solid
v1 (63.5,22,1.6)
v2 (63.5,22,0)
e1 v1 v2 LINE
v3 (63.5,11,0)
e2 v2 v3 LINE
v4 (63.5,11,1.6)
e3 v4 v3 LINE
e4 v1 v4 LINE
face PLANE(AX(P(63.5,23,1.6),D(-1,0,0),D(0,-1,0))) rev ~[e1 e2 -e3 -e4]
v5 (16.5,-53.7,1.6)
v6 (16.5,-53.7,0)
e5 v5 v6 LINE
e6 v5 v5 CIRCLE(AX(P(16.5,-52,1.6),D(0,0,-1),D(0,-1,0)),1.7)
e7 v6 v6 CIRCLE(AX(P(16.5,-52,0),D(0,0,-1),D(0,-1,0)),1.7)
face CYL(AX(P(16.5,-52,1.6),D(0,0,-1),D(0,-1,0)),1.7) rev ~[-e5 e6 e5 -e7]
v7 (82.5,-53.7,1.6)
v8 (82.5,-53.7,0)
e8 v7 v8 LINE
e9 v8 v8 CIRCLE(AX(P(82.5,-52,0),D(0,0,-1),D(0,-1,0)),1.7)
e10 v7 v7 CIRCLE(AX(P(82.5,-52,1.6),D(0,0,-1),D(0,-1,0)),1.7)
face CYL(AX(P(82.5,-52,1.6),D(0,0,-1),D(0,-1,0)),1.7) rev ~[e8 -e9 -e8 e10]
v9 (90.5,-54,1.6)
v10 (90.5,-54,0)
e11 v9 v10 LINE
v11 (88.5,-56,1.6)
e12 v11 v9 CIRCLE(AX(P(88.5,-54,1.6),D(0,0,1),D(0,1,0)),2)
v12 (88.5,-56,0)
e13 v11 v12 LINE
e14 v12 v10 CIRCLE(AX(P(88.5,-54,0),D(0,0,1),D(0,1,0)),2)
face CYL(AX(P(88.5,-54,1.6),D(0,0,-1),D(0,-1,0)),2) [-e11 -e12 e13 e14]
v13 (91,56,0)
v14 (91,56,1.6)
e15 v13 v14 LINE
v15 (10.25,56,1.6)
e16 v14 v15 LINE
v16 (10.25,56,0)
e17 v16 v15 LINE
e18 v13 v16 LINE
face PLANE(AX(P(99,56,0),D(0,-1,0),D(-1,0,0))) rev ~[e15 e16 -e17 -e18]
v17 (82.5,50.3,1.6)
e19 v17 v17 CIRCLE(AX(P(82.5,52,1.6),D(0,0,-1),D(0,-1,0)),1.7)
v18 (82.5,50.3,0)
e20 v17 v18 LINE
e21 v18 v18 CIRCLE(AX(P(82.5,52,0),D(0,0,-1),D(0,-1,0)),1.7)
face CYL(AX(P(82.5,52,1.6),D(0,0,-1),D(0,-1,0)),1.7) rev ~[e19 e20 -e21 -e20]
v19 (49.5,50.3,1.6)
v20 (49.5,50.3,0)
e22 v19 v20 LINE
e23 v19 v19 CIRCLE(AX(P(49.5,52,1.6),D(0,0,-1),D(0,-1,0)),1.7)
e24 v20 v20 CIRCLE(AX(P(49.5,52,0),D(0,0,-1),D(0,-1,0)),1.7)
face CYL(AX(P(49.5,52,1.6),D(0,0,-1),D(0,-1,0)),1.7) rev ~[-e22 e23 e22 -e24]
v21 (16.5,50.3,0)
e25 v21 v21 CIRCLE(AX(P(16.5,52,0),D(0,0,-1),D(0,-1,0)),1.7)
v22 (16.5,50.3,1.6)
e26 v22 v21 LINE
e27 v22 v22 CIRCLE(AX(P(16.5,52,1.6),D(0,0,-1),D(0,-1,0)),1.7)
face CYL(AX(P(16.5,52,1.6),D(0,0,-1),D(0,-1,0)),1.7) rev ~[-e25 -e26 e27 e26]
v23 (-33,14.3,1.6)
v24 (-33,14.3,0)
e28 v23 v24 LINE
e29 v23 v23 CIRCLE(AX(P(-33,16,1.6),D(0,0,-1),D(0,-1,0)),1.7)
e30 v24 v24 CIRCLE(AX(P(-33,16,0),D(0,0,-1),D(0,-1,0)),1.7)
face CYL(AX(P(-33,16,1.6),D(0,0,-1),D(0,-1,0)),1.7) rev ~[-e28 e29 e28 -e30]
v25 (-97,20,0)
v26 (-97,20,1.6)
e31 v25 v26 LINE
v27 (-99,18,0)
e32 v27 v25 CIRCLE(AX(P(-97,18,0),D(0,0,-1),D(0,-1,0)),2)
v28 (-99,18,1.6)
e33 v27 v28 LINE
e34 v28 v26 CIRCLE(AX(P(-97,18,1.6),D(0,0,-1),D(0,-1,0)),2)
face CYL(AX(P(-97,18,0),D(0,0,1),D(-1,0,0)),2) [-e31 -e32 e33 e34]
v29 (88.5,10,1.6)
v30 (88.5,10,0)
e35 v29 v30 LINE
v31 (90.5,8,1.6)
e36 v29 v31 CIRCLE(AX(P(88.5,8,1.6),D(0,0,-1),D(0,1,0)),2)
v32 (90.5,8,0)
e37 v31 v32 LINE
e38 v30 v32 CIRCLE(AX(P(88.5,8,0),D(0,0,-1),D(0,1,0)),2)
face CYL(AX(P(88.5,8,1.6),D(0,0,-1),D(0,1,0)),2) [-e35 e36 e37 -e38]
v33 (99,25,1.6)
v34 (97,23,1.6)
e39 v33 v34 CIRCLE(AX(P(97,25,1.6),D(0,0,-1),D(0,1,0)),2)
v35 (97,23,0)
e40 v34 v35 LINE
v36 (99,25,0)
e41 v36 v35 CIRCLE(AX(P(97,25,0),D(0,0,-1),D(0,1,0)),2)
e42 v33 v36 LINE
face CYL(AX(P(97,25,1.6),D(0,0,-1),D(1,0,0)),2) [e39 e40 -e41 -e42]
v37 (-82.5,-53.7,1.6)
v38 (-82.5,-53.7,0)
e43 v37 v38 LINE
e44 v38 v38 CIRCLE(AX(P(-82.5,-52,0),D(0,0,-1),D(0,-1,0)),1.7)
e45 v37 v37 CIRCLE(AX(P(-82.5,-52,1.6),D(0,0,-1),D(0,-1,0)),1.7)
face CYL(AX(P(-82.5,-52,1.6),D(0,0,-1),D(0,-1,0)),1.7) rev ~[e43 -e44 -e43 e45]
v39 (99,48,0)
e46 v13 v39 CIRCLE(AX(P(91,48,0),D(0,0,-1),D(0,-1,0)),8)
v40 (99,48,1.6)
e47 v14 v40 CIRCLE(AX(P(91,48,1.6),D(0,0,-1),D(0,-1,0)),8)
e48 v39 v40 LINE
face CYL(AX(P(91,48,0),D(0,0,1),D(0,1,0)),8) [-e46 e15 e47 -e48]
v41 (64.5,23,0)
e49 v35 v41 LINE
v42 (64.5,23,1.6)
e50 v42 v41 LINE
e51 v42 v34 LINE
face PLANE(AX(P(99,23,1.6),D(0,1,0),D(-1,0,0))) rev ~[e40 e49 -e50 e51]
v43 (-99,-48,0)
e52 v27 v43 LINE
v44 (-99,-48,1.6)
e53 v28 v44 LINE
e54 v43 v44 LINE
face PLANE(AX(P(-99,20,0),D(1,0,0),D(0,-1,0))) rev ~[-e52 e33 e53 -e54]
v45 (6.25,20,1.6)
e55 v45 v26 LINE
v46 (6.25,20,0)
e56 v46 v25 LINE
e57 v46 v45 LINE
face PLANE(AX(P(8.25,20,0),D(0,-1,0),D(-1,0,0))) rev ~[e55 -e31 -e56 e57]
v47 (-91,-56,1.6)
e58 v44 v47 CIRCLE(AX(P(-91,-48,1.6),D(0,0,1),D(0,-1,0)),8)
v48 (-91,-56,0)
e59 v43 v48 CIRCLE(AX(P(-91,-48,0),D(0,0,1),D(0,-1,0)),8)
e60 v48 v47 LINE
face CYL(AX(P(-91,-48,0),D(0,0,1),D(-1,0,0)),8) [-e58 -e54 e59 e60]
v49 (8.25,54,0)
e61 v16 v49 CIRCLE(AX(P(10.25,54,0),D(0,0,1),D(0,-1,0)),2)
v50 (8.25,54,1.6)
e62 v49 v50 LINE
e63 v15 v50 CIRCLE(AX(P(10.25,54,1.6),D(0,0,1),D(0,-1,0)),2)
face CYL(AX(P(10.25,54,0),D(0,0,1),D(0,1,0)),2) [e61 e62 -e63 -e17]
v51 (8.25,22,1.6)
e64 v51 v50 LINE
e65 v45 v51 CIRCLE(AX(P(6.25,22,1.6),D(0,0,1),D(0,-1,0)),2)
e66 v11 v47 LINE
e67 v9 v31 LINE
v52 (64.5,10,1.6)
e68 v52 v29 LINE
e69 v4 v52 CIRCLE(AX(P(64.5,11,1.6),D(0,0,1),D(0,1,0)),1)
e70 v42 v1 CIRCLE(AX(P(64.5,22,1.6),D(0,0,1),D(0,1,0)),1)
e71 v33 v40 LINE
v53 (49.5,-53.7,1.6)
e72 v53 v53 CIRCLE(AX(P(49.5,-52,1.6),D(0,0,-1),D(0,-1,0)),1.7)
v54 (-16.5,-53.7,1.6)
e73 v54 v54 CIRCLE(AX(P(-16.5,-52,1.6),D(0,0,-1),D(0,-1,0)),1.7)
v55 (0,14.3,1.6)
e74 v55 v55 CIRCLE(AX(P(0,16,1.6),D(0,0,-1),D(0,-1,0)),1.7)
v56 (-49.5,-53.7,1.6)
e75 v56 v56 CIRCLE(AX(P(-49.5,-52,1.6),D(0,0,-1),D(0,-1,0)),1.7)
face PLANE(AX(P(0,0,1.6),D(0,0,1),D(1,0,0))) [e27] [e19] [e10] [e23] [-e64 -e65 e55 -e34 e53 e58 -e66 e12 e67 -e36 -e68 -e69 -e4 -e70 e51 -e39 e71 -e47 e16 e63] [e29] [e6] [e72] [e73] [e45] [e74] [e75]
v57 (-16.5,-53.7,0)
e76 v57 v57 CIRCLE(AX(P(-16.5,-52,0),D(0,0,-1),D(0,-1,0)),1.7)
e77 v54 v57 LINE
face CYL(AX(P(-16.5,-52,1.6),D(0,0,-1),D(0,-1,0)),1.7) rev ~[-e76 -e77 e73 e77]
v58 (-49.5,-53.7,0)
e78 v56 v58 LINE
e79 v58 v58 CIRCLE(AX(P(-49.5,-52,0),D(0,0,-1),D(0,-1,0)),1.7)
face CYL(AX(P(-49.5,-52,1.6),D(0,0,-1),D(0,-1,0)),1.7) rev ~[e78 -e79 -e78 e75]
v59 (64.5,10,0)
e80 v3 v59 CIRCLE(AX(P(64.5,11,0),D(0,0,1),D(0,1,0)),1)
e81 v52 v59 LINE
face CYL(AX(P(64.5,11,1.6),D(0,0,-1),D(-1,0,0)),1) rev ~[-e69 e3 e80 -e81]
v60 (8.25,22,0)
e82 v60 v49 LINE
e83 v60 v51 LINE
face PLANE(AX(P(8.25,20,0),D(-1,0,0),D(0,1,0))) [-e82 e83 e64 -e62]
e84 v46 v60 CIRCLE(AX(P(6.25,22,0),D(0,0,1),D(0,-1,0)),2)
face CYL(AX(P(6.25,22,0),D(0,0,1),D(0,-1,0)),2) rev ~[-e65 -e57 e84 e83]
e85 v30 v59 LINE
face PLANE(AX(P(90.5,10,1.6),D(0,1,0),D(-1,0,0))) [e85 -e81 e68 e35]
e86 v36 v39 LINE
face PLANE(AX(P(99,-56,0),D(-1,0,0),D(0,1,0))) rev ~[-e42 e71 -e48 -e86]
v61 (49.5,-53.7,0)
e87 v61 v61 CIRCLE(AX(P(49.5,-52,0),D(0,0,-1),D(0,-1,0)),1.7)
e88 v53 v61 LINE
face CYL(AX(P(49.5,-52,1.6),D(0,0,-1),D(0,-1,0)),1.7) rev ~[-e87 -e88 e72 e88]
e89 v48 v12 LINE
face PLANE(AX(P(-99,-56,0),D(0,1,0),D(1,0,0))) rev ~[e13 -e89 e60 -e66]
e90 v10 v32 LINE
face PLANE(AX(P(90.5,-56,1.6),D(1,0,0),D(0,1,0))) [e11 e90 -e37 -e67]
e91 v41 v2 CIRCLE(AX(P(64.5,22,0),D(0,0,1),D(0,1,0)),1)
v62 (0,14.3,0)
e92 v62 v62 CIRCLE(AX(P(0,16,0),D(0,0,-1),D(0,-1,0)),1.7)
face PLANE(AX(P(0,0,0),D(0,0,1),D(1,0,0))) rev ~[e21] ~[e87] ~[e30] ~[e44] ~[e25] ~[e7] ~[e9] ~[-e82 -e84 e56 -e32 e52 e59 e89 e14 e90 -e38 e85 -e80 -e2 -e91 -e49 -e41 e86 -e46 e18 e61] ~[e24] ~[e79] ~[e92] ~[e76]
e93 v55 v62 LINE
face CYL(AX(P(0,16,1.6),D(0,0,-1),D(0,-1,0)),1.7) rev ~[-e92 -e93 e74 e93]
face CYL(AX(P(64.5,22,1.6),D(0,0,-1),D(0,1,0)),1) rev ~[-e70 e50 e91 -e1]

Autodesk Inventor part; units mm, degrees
ref_plane "YZ Plane" through (0, 0, 0) normal (1, 0, 0) x (0, 1, 0)
ref_plane "XZ Plane" through (0, 0, 0) normal (0, 1, 0) x (-1, 0, 0)
ref_plane "XY Plane" through (0, 0, 0) normal (0, 0, 1) x (1, 0, 0)
sketch "Sketch1" plane through (0, 0, 0) normal (0, 0, 1) x (1, 0, 0)
  line L0 (-99, -56) -> (99, -56)
  line L1 (99, -56) -> (99, 56)
  line L2 (99, 56) -> (-99, 56)
  line L3 (-99, 56) -> (-99, -56)
  line L4 (-99, -56) -> (99, 56) construction
  line L5 (99, -56) -> (-99, 56) construction
  line L6 (-99, -56) -> (8.25, -56)
  line L7 (8.25, -56) -> (8.25, 20)
  line L8 (8.25, 20) -> (-99, 20)
  line L9 (-99, 20) -> (-99, -56)
  line L10 (8.25, 20) -> (8.25, 56)
  point P0 (0, 0)
  dimension "d0" = 112
  dimension "d1" = 198
  dimension "d3" = 76
  dimension "d50" = 8.25
extrude "Extrusion1" add sketch "Sketch1" along normal blind 1.6 contours L3 L8 L7 L0 | L7 L10 L2 L1 L0
sketch "Sketch2" plane through (0, 0, 1.6) normal (0, 0, 1) x (1, 0, 0)
  line L0 (-99, -56) -> (99, -56) projected
  line L1 (-99, 20) -> (-99, -56) projected
  line L2 (99, 56) -> (8.25, 56) projected
  line L3 (99, -56) -> (99, 56) projected
  line L4 (8.25, 20) -> (-99, 20) projected
  line L5 (-16.5, -52) -> (16.5, -52) construction
  line L6 (-49.5, -52) -> (-16.5, -52) construction
  point P0 (0, 0)
  point P1 (-82.5, -52)
  point P2 (49.5, -52)
  point P3 (-82.5, 52)
  point P4 (-49.5, 52)
  point P5 (-16.5, 52)
  point P6 (16.5, 52)
  point P7 (49.5, 52)
  point P8 (82.5, -52)
  point P9 (82.5, 52)
  point P10 (-33, 16)
  point P11 (0, 16)
  point P12 (0, -52)
  point P13 (-33, -52)
  point P14 (-99, 56)
  dimension "d6" = 4
  dimension "d9" = 33
  dimension "d12" = 104
  dimension "d15" = 4
  dimension "d17" = 16.5
  dimension "d18" = 16.5
  dimension "d26" = 4
hole "Hole1" at (-82.5, -52, 1.6) at (-49.5, -52, 1.6) at (-16.5, -52, 1.6) at (16.5, -52, 1.6) at (49.5, -52, 1.6) at (-82.5, 52, 1.6) at (-49.5, 52, 1.6) at (-16.5, 52, 1.6) at (16.5, 52, 1.6) at (49.5, 52, 1.6) at (82.5, -52, 1.6) at (82.5, 52, 1.6) at (-33, 16, 1.6) at (0, 16, 1.6) direction (0, 0, -1) diameter 3.4 end through all
sketch "Sketch3" plane through (0, 0, 1.6) normal (0, 0, 1) x (1, 0, 0)
  circle A0 centre (0, 16) radius 1.7 projected
  circle A1 centre (-33, 16) radius 1.7 projected
  circle A2 centre (82.5, 52) radius 1.7 projected
  circle A3 centre (82.5, -52) radius 1.7 projected
  circle A4 centre (49.5, 52) radius 1.7 projected
  circle A5 centre (16.5, 52) radius 1.7 projected
  circle A6 centre (49.5, -52) radius 1.7 projected
  circle A7 centre (16.5, -52) radius 1.7 projected
  circle A8 centre (-16.5, -52) radius 1.7 projected
  circle A9 centre (-49.5, -52) radius 1.7 projected
  circle A10 centre (-82.5, -52) radius 1.7 projected
  line L0 (99, 56) -> (8.25, 56) projected
  line L1 (-99, 20) -> (-99, -56) projected
  line L2 (-99, -56) -> (99, -56) projected
  line L3 (99, -56) -> (99, 56) projected
  line L4 (99, 23) -> (0, 23) construction
  line L5 (99, 10) -> (-99, 10) construction
  line L6 (90.5, -56) -> (90.5, 10)
  line L7 (99, 23) -> (80.5, 23)
  line L8 (80.5, 23) -> (80.5, 10)
  line L9 (90.5, 10) -> (80.5, 10)
  line L10 (63.5, 10) -> (80.5, 10)
  line L11 (80.5, 10) -> (80.5, 23)
  line L12 (80.5, 23) -> (63.5, 23)
  line L13 (63.5, 23) -> (63.5, 10)
  line L14 (63.5, 10) -> (80.5, 23) construction
  line L15 (80.5, 10) -> (63.5, 23) construction
  line L16 (8.25, 56) -> (8.25, 20) projected
  line L17 (8.25, 20) -> (-99, 20) projected
  point P0 (0, 0)
  point P1 (82.5, 27)
  point P2 (72, 16.5)
  dimension "d29" = 4
  dimension "d30" = 8
  dimension "d31" = 4
  dimension "d32" = 4
  dimension "d33" = 2
  dimension "d36" = 72.5
  dimension "d37" = 17
  dimension "d38" = 13
extrude "Extrusion2" cut sketch "Sketch3" against normal through all contours L3 L2 L6 L9 L8 L7 | L8 L10 L13 L12
fillet "Fillet1" radius 8 2 edges at (-99, -56, 0.8) (99, 56, 0.8)
fillet "Fillet2" radius 2 6 edges at (90.5, 10, 0.8) (8.25, 20, 0.8) (-99, 20, 0.8) (8.25, 56, 0.8) (90.5, -56, 0.8) (99, 23, 0.8)
fillet "Fillet3" radius 1 2 edges at (63.5, 23, 0.8) (63.5, 10, 0.8)
sketch "Sketch5" plane through (0, 0, 1.6) normal (0, 0, 1) x (1, 0, 0)
  circle A0 centre (0, 16) radius 1.7 projected
  circle A1 centre (-33, 16) radius 1.7 projected
  circle A2 centre (82.5, 52) radius 1.7 projected
  circle A3 centre (82.5, -52) radius 1.7 projected
  circle A4 centre (49.5, 52) radius 1.7 projected
  circle A5 centre (16.5, 52) radius 1.7 projected
  circle A6 centre (49.5, -52) radius 1.7 projected
  circle A7 centre (16.5, -52) radius 1.7 projected
  circle A8 centre (-16.5, -52) radius 1.7 projected
  circle A9 centre (-49.5, -52) radius 1.7 projected
  circle A10 centre (-82.5, -52) radius 1.7 projected
  arc A11 (88.5, -56) -> (90.5, -54) centre (88.5, -54) ccw projected
  line L0 (90.5, -54) -> (90.5, 8) projected
  arc A12 (90.5, 8) -> (88.5, 10) centre (88.5, 8) ccw projected
  line L1 (88.5, 10) -> (64.5, 10) projected
  arc A13 (63.5, 11) -> (64.5, 10) centre (64.5, 11) ccw projected
  line L2 (63.5, 11) -> (63.5, 22) projected
  arc A14 (64.5, 23) -> (63.5, 22) centre (64.5, 22) ccw projected
  line L3 (64.5, 23) -> (97, 23) projected
  line L4 (99, 25) -> (99, 48) projected
  arc A15 (99, 48) -> (91, 56) centre (91, 48) ccw projected
  line L5 (91, 56) -> (10.25, 56) projected
  arc A16 (10.25, 56) -> (8.25, 54) centre (10.25, 54) ccw projected
  line L6 (8.25, 54) -> (8.25, 22) projected
  arc A17 (6.25, 20) -> (8.25, 22) centre (6.25, 22) ccw projected
  line L7 (6.25, 20) -> (-97, 20) projected
  arc A18 (-97, 20) -> (-99, 18) centre (-97, 18) ccw projected
  line L8 (-99, 18) -> (-99, -48) projected
  arc A19 (-99, -48) -> (-91, -56) centre (-91, -48) ccw projected
  line L9 (-91, -56) -> (88.5, -56) projected
  arc A20 (97, 23) -> (99, 25) centre (97, 25) ccw projected
  point P0 (0, 0)
equation "\"d15\" = d6"
equation "\"d18\" = d17"
equation "\"d31\" = d32"
properties part number "Class-D RevA Board Outline"
